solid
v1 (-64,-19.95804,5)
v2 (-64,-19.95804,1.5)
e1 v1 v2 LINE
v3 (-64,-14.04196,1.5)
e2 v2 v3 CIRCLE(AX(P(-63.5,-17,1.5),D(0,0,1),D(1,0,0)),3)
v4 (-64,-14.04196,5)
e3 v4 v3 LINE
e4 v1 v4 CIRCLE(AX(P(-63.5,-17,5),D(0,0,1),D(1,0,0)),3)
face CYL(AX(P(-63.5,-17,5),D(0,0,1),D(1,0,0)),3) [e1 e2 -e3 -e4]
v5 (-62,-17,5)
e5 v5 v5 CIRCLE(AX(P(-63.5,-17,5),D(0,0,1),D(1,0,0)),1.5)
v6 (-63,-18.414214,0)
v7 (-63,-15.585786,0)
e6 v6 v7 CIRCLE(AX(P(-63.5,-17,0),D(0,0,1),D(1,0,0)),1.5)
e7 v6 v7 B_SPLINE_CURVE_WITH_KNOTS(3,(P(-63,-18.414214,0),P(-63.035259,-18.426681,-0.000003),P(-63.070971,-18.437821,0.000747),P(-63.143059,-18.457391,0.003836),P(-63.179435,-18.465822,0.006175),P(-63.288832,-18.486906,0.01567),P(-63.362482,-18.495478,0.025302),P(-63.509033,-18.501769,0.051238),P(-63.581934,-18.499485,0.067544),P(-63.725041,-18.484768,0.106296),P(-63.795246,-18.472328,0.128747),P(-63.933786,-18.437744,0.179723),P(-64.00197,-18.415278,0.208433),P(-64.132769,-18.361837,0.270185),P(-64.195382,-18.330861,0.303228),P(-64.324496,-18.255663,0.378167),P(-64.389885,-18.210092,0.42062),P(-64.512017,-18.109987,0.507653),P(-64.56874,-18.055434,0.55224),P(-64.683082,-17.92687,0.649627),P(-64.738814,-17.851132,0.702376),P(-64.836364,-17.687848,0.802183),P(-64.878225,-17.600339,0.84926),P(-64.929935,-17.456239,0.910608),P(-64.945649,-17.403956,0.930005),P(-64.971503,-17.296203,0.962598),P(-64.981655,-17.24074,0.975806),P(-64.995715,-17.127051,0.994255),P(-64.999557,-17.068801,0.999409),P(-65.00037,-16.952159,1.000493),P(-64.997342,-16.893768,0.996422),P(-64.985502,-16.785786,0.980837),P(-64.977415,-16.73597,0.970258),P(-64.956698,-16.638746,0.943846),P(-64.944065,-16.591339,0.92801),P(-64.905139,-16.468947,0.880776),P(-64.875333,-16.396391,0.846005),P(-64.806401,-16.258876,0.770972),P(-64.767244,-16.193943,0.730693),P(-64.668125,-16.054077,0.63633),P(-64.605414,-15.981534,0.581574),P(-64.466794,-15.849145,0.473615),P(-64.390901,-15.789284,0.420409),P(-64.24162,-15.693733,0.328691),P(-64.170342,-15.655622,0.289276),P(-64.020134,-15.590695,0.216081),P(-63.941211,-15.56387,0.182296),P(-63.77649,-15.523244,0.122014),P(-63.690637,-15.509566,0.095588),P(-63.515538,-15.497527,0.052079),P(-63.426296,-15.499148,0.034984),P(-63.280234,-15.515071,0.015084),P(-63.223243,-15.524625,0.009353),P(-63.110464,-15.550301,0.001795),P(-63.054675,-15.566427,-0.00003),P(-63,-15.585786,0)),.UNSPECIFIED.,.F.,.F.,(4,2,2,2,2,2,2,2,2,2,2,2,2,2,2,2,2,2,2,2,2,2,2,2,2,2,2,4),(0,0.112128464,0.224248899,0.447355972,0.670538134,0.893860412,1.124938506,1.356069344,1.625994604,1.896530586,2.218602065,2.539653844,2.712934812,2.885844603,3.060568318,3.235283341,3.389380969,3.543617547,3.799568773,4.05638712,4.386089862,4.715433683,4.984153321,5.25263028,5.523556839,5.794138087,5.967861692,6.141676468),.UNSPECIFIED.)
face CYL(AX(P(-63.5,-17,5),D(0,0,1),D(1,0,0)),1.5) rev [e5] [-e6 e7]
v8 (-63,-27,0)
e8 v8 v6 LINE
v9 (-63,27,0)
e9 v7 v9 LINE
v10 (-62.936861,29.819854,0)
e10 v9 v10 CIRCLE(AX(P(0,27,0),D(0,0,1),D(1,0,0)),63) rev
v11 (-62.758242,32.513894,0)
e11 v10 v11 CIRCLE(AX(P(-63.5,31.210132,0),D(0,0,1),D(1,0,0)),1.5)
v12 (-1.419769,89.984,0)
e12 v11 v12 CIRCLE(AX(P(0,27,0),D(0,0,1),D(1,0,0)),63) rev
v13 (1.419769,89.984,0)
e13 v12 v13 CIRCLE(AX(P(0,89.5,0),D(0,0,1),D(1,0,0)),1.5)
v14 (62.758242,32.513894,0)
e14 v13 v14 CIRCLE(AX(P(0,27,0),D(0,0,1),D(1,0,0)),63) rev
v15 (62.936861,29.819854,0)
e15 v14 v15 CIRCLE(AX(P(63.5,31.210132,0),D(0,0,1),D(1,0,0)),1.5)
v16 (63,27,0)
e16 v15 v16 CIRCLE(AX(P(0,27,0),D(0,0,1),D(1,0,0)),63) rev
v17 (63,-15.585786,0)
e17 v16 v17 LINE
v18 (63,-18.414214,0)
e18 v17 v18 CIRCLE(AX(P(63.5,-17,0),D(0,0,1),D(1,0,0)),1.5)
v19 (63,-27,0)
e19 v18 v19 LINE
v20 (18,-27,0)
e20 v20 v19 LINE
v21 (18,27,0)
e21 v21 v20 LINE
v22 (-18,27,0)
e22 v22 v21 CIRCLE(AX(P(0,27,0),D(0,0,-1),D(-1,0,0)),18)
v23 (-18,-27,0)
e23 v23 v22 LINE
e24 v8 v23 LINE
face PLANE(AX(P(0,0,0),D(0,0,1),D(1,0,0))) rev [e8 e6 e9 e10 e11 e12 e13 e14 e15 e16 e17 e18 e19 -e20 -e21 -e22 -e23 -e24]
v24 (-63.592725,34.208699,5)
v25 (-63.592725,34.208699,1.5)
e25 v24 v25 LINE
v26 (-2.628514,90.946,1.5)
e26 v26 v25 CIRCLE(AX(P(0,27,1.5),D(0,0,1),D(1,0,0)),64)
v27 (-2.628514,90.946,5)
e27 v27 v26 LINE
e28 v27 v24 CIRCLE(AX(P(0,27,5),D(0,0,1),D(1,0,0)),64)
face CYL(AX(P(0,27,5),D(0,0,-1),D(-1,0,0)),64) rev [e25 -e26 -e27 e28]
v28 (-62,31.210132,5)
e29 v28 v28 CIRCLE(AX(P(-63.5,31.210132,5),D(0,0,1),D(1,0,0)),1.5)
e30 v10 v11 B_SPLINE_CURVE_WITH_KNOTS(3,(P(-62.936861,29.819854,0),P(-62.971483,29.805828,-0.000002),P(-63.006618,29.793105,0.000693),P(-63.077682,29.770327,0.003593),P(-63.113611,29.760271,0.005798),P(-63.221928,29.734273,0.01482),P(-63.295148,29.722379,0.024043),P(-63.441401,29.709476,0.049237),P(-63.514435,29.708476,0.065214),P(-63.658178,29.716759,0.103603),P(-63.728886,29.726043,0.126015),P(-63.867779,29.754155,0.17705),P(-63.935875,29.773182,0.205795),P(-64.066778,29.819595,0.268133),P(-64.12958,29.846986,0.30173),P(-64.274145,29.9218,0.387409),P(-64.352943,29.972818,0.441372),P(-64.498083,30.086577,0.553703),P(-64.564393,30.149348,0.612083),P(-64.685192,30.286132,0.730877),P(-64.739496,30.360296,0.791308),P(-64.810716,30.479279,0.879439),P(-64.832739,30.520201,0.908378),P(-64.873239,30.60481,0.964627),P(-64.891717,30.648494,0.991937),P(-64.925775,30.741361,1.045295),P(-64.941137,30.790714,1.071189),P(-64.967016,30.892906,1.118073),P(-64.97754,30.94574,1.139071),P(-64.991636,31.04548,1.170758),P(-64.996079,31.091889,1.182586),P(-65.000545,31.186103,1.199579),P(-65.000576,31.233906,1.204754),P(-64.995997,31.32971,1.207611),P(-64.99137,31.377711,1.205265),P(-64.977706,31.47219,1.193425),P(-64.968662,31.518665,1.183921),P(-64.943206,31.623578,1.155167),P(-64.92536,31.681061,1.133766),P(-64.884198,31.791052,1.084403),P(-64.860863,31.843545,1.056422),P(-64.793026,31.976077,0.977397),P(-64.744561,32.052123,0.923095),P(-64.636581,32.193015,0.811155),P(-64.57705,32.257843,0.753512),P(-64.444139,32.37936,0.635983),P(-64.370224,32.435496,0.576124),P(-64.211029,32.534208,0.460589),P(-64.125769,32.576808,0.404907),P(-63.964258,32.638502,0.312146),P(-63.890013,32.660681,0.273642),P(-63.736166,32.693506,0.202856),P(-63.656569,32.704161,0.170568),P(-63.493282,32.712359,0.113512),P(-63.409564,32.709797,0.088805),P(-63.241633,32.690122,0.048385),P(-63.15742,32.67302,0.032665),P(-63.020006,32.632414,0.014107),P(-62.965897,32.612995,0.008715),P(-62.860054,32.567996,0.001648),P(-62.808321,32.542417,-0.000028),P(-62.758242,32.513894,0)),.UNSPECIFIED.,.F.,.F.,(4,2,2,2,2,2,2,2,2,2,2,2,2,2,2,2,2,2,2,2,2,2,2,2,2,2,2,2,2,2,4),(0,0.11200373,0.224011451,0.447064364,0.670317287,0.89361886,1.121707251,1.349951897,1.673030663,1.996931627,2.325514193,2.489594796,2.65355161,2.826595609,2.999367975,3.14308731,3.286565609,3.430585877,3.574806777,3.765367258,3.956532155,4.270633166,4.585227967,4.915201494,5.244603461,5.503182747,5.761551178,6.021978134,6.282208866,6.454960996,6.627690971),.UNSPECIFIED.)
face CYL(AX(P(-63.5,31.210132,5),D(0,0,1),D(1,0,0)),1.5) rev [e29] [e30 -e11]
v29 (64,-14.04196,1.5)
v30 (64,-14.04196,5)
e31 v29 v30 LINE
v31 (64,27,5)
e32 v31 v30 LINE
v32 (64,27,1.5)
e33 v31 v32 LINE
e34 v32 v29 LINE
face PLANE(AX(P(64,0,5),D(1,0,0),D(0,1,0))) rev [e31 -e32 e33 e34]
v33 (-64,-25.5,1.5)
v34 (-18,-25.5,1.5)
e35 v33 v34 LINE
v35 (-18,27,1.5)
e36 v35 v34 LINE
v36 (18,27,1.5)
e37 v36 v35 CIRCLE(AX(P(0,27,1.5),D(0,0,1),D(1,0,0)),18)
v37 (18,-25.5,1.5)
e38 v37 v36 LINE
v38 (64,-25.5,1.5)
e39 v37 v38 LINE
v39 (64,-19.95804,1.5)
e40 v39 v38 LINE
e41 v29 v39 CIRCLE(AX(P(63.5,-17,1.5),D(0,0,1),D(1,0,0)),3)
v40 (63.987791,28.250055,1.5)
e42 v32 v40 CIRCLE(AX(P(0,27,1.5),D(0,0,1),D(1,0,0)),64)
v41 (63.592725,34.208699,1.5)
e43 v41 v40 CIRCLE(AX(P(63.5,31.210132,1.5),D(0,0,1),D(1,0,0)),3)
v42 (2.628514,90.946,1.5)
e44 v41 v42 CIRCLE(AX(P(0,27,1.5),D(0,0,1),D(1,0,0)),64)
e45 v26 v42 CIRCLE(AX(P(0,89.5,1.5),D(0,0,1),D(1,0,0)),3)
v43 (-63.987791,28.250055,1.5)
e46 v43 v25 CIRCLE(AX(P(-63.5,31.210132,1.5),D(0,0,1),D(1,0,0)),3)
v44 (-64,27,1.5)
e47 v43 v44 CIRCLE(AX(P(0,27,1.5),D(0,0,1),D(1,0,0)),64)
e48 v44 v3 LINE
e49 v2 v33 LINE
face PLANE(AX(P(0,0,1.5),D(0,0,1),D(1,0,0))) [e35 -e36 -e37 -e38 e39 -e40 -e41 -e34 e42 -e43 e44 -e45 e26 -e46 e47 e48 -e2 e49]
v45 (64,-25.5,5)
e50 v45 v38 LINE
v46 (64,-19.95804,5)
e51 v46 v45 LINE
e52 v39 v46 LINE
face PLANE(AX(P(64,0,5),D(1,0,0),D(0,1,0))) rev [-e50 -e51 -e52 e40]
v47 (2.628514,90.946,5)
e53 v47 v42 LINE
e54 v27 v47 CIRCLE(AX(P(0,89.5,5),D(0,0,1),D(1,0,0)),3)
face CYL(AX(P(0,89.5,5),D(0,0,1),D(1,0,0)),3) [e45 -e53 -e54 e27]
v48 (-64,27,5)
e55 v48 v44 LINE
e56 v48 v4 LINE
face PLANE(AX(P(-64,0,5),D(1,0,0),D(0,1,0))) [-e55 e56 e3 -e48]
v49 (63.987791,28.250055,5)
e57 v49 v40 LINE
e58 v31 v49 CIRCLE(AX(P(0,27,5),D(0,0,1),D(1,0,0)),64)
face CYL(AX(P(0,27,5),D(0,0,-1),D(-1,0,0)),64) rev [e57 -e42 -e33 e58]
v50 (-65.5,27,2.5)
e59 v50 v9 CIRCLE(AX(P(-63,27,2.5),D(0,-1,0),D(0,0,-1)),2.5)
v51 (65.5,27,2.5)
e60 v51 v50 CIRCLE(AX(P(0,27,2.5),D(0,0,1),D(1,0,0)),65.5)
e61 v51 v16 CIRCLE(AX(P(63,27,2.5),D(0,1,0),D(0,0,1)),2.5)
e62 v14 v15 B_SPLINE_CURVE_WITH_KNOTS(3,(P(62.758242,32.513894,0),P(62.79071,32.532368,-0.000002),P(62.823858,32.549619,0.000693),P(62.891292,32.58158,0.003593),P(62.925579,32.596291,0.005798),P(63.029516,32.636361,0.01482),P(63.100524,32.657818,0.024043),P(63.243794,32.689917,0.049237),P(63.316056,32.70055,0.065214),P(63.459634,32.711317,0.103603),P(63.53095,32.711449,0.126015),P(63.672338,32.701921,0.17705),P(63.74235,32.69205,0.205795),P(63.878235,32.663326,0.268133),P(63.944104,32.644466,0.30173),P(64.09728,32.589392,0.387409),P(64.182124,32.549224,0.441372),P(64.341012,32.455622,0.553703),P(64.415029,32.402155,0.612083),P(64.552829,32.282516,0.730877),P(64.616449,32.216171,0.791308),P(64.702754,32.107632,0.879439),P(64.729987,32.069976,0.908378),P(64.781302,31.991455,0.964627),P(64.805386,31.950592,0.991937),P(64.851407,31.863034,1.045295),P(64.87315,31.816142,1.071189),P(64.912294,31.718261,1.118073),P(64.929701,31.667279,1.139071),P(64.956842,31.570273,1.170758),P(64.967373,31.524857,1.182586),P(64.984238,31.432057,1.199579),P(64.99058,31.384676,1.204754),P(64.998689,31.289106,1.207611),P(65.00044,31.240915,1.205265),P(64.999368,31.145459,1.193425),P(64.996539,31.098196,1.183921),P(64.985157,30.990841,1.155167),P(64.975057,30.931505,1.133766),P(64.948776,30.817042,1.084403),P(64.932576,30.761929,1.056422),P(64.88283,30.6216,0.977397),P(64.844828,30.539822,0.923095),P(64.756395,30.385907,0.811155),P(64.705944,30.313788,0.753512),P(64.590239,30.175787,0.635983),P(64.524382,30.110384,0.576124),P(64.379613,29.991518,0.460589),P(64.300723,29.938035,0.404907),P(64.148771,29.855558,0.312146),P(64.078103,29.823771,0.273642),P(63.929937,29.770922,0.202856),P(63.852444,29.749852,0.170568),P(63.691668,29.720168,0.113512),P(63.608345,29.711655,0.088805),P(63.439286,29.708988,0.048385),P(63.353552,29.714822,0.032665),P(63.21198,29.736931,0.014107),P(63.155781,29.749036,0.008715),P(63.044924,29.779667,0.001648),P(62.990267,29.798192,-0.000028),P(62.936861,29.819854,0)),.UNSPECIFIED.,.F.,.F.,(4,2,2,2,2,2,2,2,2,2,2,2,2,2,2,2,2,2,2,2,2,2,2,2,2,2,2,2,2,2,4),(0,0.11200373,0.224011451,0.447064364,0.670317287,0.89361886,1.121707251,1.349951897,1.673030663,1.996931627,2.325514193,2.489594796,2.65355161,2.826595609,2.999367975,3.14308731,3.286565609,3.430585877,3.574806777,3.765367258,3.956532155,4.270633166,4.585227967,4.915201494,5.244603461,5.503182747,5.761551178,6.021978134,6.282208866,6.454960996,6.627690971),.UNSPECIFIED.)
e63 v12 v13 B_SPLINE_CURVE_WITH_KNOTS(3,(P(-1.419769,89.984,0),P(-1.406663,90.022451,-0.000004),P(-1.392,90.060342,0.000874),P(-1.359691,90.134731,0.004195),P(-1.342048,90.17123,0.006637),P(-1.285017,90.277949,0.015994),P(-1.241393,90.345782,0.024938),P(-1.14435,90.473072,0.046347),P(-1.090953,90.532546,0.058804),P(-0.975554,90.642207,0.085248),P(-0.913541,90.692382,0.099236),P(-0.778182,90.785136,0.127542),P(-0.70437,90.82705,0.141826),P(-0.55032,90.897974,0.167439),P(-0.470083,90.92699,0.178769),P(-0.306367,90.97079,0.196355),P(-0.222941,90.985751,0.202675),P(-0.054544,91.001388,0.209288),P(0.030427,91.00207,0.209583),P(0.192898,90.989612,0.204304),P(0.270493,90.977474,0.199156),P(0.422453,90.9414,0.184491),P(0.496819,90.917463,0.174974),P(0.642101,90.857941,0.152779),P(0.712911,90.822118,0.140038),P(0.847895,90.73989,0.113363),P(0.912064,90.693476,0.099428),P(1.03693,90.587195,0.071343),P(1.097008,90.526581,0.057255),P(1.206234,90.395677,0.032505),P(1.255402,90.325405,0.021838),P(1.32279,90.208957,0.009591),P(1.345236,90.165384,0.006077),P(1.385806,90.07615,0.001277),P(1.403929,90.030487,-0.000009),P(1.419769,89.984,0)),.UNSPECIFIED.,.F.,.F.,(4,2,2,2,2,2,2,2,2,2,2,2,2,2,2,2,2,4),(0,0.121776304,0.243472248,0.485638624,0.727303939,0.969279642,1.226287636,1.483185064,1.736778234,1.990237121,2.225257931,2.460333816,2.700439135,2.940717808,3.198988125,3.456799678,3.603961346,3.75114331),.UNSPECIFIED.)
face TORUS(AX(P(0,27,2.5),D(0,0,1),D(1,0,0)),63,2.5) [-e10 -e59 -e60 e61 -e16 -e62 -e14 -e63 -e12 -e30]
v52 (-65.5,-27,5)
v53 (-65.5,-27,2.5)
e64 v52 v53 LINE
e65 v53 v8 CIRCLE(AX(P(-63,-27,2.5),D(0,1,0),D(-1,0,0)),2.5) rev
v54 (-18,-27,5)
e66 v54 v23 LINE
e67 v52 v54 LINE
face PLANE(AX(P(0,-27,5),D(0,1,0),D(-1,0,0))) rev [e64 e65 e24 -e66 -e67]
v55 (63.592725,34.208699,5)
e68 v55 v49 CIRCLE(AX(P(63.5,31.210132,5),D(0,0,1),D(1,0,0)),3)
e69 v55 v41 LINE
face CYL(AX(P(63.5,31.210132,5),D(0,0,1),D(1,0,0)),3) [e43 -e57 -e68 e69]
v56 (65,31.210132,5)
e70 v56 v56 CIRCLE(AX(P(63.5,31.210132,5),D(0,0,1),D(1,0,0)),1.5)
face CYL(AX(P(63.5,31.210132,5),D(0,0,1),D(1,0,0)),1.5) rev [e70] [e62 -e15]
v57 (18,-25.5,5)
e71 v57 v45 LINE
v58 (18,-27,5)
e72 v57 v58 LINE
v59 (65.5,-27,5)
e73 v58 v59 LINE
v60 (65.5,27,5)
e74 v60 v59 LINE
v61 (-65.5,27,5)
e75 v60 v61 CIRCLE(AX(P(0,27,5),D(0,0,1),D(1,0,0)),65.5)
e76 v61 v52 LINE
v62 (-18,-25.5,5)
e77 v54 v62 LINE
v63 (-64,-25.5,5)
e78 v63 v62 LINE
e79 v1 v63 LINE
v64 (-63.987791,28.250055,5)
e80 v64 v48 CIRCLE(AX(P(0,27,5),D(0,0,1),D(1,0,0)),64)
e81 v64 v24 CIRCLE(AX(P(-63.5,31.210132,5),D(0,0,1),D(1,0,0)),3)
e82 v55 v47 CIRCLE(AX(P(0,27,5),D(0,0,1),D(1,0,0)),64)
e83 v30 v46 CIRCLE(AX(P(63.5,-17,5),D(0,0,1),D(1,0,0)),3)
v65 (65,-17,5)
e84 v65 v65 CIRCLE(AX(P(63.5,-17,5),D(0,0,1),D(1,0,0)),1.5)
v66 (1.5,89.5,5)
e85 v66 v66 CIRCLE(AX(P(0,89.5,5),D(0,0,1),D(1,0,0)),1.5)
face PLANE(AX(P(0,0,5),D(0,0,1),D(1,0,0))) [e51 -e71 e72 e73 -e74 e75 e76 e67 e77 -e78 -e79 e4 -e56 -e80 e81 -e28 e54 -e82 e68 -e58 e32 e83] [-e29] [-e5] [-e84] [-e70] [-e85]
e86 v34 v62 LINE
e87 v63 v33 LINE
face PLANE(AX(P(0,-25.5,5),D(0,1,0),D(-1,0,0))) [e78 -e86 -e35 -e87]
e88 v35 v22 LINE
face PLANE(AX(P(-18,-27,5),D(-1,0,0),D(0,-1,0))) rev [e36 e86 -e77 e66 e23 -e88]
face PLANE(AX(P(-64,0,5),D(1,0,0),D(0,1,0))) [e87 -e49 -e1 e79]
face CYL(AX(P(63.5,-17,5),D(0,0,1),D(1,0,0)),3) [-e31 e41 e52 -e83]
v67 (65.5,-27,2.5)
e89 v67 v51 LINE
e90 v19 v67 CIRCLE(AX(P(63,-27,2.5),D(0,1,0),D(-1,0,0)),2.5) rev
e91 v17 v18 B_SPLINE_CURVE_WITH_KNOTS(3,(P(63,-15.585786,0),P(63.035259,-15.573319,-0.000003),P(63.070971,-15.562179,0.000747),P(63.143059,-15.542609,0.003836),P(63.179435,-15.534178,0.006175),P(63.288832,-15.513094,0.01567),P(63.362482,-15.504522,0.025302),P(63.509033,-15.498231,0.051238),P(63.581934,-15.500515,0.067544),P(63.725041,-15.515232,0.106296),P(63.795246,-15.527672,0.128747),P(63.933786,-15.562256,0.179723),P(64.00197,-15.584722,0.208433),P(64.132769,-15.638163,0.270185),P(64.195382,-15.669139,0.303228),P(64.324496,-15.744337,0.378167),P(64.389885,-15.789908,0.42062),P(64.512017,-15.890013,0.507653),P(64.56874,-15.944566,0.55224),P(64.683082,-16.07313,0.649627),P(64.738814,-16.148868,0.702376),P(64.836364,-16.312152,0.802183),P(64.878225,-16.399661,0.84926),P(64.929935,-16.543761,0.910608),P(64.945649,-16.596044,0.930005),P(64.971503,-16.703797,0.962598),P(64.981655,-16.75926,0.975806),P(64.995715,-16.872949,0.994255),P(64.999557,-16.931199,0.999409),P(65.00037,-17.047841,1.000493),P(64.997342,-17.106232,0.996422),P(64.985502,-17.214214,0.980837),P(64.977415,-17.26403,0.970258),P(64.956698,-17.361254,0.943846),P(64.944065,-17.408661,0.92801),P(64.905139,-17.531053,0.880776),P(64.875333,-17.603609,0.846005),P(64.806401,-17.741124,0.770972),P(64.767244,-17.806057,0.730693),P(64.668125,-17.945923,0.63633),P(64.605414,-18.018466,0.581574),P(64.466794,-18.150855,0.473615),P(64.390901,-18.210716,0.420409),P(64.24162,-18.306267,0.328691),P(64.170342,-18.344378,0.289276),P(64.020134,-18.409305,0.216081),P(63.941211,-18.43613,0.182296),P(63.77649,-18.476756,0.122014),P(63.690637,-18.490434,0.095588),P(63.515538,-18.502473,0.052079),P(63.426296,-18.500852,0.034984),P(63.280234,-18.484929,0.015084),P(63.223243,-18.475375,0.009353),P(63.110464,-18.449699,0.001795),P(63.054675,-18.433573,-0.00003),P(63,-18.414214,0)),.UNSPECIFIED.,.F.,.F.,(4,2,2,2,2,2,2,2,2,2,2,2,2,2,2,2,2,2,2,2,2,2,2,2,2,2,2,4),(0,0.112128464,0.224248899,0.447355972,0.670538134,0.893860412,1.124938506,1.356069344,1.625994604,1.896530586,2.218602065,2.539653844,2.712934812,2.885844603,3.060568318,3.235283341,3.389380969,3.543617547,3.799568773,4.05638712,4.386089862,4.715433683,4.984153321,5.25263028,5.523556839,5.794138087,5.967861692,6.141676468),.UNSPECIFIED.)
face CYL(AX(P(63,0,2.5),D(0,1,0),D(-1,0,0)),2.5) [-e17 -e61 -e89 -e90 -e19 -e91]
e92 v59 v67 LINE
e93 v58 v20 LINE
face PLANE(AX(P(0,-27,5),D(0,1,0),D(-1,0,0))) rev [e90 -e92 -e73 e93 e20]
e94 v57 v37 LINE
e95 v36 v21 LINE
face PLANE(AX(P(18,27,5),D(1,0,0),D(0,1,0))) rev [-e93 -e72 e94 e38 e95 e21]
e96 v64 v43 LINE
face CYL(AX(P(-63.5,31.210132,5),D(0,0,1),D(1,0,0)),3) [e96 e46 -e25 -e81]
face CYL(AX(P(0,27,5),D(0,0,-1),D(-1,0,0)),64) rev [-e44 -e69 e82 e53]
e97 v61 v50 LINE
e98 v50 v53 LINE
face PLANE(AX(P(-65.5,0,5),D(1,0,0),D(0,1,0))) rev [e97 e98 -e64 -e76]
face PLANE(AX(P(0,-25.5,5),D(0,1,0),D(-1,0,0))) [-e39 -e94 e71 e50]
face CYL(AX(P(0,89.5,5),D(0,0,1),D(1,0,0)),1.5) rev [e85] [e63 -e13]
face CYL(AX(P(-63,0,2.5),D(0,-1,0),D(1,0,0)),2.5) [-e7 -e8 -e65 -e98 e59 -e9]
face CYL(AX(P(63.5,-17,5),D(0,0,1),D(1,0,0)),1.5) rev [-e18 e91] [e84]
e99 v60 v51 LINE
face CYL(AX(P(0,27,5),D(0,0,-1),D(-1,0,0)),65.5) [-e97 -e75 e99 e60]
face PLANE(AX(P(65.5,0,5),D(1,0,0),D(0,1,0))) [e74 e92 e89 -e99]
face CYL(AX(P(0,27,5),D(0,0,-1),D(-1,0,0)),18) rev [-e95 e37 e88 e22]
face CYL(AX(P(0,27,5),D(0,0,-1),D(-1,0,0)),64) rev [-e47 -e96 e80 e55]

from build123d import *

# Parameters (mm, degrees)
SKETCH3_W                    = 131
SKETCH3_H                    = 54
BOSS_EXTRUDE2_DEPTH          = 5
F_3_0_3_DIAMETER_HOLE1_D     = 3
F_3_0_3_DIAMETER_HOLE1_DEPTH = 20
F_3_0_3_DIAMETER_HOLE1_TIP   = 0.901290929
SHELL1_T                     = -1.5
CUT_EXTRUDE1_DEPTH           = 114.452633288
FILLET2_START                = -28
FILLET2_DEPTH                = 120.497573337
FILLET2_2_ANGLE              = 180


with BuildPart() as part:
    # Sketch3 → Boss-Extrude2 (new body)
    with BuildSketch(Plane.XY):
        with BuildLine():
            Line((-65.5, 27), (65.5, 27))
            ThreePointArc((65.5, 27), (0, 92.5), (-65.5, 27))
        make_face()
        Rectangle(SKETCH3_W, SKETCH3_H)
    extrude(amount=BOSS_EXTRUDE2_DEPTH)

    # Ø3.0 (3) Diameter Hole1
    with Locations(Plane.XY.offset(5)):
        with Locations((-63.5, -17), (63.5, -17), (0, 89.5), (63.5, 31.210132452), (-63.5, 31.210132452)):
            Hole(F_3_0_3_DIAMETER_HOLE1_D / 2, depth=F_3_0_3_DIAMETER_HOLE1_DEPTH)
            with Locations((0, 0, -(F_3_0_3_DIAMETER_HOLE1_DEPTH + F_3_0_3_DIAMETER_HOLE1_TIP / 2))):  # 118° drill point
                Cone(0, F_3_0_3_DIAMETER_HOLE1_D / 2, F_3_0_3_DIAMETER_HOLE1_TIP, mode=Mode.SUBTRACT)

    # Shell1
    shell1_openings = [part.faces().sort_by_distance(p)[0] for p in [
        (0, 26.743328941, 5),
    ]]
    offset(amount=SHELL1_T, openings=shell1_openings)

    # Sketch6 → Cut-Extrude1 (cut, through all)
    with BuildSketch(Plane(origin=(0, 0, 0), x_dir=(-1, 0, 0), z_dir=(0, 0, -1))):
        with BuildLine():
            Line((-18, 27), (-18, -27))
            Line((-18, -27), (18, -27))
            Line((18, -27), (18, 27))
            ThreePointArc((18, 27), (0, 45), (-18, 27))
        make_face()
    extrude(amount=-CUT_EXTRUDE1_DEPTH, mode=Mode.SUBTRACT)

    # Fillet2: read off the stored shape, not the designer's step
    # Fillet2 outline → Fillet2 (cut)
    with BuildSketch(Plane(origin=(0, 0, 0), x_dir=(1, 0, 0), z_dir=(0, 1, 0)).offset(FILLET2_START)):
        with BuildLine():
            ThreePointArc((-65.5, -2.5), (-64.767766953, -0.732233047), (-63, 0))
            Line((-63, 0), (-65.5, 0))
            Line((-65.5, 0), (-65.5, -2.5))
        make_face()
        with BuildLine():
            ThreePointArc((63, 0), (64.767766953, -0.732233047), (65.5, -2.5))
            Line((65.5, -2.5), (65.5, 0))
            Line((65.5, 0), (63, 0))
        make_face()
    extrude(amount=FILLET2_DEPTH, mode=Mode.SUBTRACT)

    # Fillet2 2 outline → Fillet2 2 (revolve, cut)
    with BuildSketch(Plane.XZ.offset(-27)):
        with BuildLine():
            ThreePointArc((65.5, 2.5), (64.767766953, 0.732233047), (63, 0))
            Line((63, 0), (65.5, 0))
            Line((65.5, 0), (65.5, 2.5))
        make_face()
    revolve(axis=Axis((0, 27, 0), (0, 0, 1)), revolution_arc=FILLET2_2_ANGLE, mode=Mode.SUBTRACT)


solid = part.part
